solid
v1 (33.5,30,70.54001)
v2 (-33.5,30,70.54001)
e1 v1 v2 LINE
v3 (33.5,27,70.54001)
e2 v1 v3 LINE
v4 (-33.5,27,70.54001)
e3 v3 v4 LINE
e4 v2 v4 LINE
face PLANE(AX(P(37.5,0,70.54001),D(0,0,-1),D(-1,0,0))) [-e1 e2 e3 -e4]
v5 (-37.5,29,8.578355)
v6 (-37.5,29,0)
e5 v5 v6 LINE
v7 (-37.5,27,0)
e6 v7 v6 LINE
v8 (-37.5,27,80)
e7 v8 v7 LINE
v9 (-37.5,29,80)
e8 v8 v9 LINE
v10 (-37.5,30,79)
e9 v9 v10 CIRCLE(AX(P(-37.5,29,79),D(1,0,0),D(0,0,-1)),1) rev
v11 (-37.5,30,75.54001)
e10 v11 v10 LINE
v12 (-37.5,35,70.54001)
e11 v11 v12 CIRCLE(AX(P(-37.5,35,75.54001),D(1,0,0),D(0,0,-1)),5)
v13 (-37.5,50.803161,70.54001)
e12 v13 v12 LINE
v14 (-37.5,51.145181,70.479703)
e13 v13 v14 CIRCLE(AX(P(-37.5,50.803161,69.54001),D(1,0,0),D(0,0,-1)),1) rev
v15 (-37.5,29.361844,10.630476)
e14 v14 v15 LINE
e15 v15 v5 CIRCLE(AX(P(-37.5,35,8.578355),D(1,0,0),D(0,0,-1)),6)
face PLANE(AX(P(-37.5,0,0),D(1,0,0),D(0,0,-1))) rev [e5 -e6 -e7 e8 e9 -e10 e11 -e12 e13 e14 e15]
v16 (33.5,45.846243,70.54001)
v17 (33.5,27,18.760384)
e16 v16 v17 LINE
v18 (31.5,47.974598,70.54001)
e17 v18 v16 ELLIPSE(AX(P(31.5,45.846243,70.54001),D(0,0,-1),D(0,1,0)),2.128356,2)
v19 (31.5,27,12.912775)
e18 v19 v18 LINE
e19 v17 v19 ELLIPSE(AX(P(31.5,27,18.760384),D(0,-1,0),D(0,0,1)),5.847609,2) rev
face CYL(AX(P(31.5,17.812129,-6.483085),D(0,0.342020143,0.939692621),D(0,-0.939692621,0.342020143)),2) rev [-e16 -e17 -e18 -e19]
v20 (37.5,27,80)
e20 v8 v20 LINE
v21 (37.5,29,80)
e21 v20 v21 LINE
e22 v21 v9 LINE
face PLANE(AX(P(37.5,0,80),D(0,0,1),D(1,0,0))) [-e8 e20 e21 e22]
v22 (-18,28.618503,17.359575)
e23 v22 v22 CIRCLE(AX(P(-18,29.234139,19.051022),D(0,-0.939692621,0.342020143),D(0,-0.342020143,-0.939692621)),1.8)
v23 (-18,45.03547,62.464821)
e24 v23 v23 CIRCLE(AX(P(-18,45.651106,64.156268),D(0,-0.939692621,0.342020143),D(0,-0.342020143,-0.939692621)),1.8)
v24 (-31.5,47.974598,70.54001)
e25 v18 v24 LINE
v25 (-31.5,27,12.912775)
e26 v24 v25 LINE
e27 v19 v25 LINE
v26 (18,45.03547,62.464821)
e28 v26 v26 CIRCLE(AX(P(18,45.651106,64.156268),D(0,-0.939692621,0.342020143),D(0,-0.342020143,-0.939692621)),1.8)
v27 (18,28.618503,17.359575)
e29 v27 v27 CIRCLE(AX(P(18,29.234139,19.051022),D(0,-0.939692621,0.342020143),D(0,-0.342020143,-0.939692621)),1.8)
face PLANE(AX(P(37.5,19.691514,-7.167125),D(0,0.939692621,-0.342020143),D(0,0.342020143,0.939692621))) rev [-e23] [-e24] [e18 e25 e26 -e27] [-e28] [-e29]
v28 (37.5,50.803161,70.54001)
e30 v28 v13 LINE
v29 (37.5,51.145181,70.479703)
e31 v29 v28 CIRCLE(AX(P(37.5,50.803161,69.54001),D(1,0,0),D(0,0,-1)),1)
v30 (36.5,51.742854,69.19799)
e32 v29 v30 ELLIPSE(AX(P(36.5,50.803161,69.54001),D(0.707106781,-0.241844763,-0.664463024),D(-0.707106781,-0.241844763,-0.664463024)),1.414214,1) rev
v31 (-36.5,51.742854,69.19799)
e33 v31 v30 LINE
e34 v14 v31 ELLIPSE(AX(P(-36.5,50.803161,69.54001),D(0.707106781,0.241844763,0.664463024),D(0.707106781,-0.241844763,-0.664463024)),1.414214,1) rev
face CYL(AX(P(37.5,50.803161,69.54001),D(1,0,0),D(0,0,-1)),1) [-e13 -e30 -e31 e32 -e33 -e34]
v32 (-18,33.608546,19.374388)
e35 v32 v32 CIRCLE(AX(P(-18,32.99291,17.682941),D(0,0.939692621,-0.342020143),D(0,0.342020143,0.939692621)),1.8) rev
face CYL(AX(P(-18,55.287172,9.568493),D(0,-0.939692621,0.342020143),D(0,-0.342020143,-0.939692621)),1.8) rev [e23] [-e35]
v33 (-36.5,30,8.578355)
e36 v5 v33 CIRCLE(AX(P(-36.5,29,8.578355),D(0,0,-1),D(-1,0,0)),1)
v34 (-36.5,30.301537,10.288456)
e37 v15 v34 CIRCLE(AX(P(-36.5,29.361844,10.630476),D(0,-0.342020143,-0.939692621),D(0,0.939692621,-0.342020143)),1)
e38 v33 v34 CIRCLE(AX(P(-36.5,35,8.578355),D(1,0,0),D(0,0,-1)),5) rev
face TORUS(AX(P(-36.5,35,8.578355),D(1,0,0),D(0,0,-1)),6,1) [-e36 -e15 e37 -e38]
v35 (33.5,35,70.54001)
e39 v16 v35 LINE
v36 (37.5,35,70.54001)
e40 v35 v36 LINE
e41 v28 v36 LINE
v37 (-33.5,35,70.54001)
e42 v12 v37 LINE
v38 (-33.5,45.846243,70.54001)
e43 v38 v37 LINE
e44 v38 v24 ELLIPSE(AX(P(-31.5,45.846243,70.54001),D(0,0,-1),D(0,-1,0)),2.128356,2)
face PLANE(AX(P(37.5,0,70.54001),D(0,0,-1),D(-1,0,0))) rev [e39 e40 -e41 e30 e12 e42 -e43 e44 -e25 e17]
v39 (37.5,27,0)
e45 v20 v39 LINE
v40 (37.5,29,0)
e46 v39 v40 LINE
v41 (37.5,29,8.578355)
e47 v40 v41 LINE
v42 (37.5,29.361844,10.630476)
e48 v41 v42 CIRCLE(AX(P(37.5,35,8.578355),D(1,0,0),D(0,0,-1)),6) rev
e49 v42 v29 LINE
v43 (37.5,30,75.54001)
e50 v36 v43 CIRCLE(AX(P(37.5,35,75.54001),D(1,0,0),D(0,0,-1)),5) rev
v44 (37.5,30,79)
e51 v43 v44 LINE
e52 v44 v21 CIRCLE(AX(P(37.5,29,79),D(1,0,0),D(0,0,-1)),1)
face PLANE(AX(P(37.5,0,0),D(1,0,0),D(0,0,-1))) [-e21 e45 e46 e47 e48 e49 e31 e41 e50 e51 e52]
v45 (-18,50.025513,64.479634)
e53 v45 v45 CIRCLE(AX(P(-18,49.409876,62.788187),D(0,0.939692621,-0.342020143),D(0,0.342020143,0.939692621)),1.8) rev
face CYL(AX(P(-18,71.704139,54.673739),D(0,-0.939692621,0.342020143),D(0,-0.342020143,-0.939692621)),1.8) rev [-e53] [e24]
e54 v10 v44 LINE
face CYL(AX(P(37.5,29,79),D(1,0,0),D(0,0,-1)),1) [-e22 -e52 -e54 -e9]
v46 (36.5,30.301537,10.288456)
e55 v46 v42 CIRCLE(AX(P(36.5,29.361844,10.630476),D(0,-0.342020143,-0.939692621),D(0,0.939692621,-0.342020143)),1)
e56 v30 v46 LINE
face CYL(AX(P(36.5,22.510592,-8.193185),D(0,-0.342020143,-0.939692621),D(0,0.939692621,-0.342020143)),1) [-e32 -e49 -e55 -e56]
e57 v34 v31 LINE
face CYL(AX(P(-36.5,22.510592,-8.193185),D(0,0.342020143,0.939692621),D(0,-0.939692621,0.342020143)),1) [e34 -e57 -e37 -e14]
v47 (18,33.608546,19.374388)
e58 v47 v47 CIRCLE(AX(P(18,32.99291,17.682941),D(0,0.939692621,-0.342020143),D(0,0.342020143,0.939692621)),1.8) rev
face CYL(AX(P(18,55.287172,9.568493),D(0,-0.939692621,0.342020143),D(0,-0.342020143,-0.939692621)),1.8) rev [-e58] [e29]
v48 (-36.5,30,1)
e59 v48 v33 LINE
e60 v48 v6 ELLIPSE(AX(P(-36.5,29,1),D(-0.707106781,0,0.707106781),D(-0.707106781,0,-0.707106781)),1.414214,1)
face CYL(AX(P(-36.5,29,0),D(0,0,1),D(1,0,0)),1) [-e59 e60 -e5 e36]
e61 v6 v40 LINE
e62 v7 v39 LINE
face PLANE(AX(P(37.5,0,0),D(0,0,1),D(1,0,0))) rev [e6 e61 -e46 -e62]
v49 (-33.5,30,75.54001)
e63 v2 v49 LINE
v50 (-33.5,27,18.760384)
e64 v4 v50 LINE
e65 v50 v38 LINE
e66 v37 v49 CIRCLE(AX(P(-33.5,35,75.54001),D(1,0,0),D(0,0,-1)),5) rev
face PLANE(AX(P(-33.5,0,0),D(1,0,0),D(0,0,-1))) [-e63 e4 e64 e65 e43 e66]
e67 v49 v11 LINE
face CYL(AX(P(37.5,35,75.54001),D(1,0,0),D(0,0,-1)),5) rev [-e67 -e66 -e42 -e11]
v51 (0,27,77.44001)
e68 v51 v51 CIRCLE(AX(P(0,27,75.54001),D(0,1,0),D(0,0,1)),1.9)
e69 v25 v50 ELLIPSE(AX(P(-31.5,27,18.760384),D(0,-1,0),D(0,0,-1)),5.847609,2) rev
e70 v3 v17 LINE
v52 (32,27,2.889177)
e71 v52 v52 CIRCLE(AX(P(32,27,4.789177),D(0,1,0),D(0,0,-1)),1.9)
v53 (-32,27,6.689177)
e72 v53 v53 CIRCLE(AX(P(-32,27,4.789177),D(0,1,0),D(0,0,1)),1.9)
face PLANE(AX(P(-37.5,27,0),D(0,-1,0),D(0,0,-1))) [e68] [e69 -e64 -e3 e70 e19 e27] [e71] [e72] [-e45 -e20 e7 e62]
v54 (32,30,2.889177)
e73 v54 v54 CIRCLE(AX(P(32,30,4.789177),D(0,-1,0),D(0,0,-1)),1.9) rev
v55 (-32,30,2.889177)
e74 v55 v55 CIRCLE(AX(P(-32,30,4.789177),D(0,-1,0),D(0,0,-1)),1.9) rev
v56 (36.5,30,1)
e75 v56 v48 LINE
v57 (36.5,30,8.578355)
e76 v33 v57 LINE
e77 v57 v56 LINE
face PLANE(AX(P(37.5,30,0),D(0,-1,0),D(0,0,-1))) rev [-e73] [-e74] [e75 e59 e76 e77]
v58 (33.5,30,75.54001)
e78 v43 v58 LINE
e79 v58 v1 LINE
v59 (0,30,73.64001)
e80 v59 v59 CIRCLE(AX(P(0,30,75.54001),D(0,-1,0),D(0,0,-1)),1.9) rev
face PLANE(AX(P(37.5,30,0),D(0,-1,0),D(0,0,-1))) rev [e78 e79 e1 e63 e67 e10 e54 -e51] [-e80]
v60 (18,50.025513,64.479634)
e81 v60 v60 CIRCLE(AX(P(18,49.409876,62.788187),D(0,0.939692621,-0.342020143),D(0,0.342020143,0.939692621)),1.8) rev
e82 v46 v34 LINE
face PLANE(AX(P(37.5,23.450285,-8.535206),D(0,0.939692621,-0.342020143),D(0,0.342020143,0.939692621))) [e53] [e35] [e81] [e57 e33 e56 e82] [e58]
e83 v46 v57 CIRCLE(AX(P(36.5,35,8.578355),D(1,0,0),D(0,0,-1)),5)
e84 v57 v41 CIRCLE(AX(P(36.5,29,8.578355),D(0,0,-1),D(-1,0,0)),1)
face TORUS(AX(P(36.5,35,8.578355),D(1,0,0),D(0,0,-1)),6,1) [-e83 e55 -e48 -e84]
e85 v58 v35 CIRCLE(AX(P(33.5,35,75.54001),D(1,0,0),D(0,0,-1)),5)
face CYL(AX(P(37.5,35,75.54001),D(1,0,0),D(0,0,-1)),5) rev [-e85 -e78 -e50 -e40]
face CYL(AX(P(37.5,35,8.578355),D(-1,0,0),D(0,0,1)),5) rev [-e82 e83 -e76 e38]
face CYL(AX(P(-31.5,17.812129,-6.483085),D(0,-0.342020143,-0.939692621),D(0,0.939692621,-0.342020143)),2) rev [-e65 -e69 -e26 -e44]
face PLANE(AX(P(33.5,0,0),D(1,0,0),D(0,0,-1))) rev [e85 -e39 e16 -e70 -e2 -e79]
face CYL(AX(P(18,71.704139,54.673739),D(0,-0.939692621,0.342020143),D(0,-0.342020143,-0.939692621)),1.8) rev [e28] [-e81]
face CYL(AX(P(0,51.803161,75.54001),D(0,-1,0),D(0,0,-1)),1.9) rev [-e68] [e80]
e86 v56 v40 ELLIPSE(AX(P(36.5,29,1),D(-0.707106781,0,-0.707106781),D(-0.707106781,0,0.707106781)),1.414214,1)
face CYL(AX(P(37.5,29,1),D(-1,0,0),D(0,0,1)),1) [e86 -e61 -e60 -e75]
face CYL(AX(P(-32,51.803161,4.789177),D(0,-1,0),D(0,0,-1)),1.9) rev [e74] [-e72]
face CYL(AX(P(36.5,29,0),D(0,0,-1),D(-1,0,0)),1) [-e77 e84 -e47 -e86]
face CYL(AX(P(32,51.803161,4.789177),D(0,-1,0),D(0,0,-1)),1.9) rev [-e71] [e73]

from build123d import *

# Parameters (mm, degrees)
EXTRUDE_1_DEPTH          = 37.5
SHELL_START              = -33.5
SHELL_1_DEPTH            = 67
FILLET_1_R               = 5
FILLET_3_R               = 2
FILLET_4_R               = 1
CUT_EXTRUDE_2_DEPTH      = 94.307288033
CUT_EXTRUDE_2_DEPTH_BACK = 3
SKETCH_3_R               = 1.9
CUT_EXTRUDE_1_DEPTH      = 103.419810201
CUT_EXTRUDE_1_DEPTH_BACK = 103.419810201
SKETCH_2_W               = 80
SKETCH_2_H               = 27
CUT_EXTRUDE_3_REACH      = 102.177
SKETCH_4_R               = 1.8


# Read off the part's stored shape, not the designer's step: 抽壳1
with BuildPart() as part:
    # 草图1 → 凸台-拉伸1 (new, symmetric)
    with BuildSketch(Plane(origin=(0, 0, 0), x_dir=(0, 0, -1), z_dir=(1, 0, 0))):
        Polygon((-70.540010176, 52.231309316), (-70.540010176, 30), (-80, 30), (-80, 0), (0, 0), (0, 30), (-9.459989824, 30), align=None)
    extrude(amount=EXTRUDE_1_DEPTH, both=True)

    # 抽壳1 outline → 抽壳1 (cut)
    with BuildSketch(Plane.YZ.offset(SHELL_START)):
        Polygon((47.974598226, 70.540010176), (22, 70.540010176), (22, 80), (4, 80), (4, 6), (24.483955603, 6), align=None)
    extrude(amount=SHELL_1_DEPTH, mode=Mode.SUBTRACT)

    # 圆角1
    fillet_1_edges = [part.edges().sort_by_distance(p)[0] for p in [
        (0, 30, 9.459989824),
        (35.5, 30, 70.540010176),
        (-35.5, 30, 70.540010176),
    ]]
    fillet(fillet_1_edges, radius=FILLET_1_R)

    # 圆角3
    fillet_3_edges = [part.edges().sort_by_distance(p)[0] for p in [
        (33.5, 4, 43),
        (33.5, 36.229276914, 38.270005088),
        (-33.5, 36.229276914, 38.270005088),
        (-33.5, 4, 43),
    ]]
    fillet(fillet_3_edges, radius=FILLET_3_R)

    # 圆角4
    fillet_4_edges = [part.edges().sort_by_distance(p)[0] for p in [
        (-37.5, 30, 4.28917746),
        (-37.5, 30.075961235, 9.446595809),
        (37.5, 30, 4.28917746),
        (37.5, 30.075961235, 9.446595809),
        (-37.5, 41.266423106, 40.414232907),
        (0, 52.231309316, 70.540010176),
        (37.5, 41.266423106, 40.414232907),
        (37.5, 0, 40),
        (-37.5, 0, 40),
        (0, 0, 80),
        (0, 0, 0),
        (0, 30, 0),
        (0, 30, 80),
    ]]
    fillet(fillet_4_edges, radius=FILLET_4_R)

    # 草图3 → 切除-拉伸2 (cut, two sides: drawn at the far end of the back side and taken through both)
    with BuildSketch(Plane(origin=(0, 30, 0), x_dir=(1, 0, 0), z_dir=(0, 1, 0)).offset(-CUT_EXTRUDE_2_DEPTH_BACK)):
        with Locations(Location((-32, -4.78917746, 0), (0, 0, 90))):
            Circle(SKETCH_3_R)
        with Locations(Location((32, -4.78917746, 0), (0, 0, 90))):
            Circle(SKETCH_3_R)
        with Locations(Location((0, -75.540010176, 0), (0, 0, 90))):
            Circle(SKETCH_3_R)
    extrude(amount=CUT_EXTRUDE_2_DEPTH + CUT_EXTRUDE_2_DEPTH_BACK, mode=Mode.SUBTRACT)

    # 草图2 → 切除-拉伸1 (cut, two sides: drawn at the far end of the back side and taken through both)
    with BuildSketch(Plane(origin=(0, 0, 0), x_dir=(0, 0, -1), z_dir=(1, 0, 0)).offset(-CUT_EXTRUDE_1_DEPTH_BACK)):
        with Locations((-40, 13.5)):
            Rectangle(SKETCH_2_W, SKETCH_2_H)
    extrude(amount=CUT_EXTRUDE_1_DEPTH + CUT_EXTRUDE_1_DEPTH_BACK, mode=Mode.SUBTRACT)

    # 草图4 → 切除-拉伸3 (cut, up to next)
    with BuildSketch(Plane(origin=(0, 19.69151404, -7.167124978), x_dir=(1, 0, 0), z_dir=(0, -0.9396926207859104, 0.34202014332566316)), mode=Mode.PRIVATE) as cut_extrude_3_sk1:
        with Locations(Location((-18, 75.900768948, 0), (0, 0, 270))):
            Circle(SKETCH_4_R)
    cut_extrude_3_tool1 = extrude(cut_extrude_3_sk1.sketch, amount=-CUT_EXTRUDE_3_REACH, mode=Mode.PRIVATE) & part.part
    # 草图4 → 切除-拉伸3 (cut, up to next)
    with BuildSketch(Plane(origin=(0, 19.69151404, -7.167124978), x_dir=(1, 0, 0), z_dir=(0, -0.9396926207859104, 0.34202014332566316)), mode=Mode.PRIVATE) as cut_extrude_3_sk2:
        with Locations(Location((18, 75.900768948, 0), (0, 0, 270))):
            Circle(SKETCH_4_R)
    cut_extrude_3_tool2 = extrude(cut_extrude_3_sk2.sketch, amount=-CUT_EXTRUDE_3_REACH, mode=Mode.PRIVATE) & part.part
    # 草图4 → 切除-拉伸3 (cut, up to next)
    with BuildSketch(Plane(origin=(0, 19.69151404, -7.167124978), x_dir=(1, 0, 0), z_dir=(0, -0.9396926207859104, 0.34202014332566316)), mode=Mode.PRIVATE) as cut_extrude_3_sk3:
        with Locations(Location((-18, 27.900768948, 0), (0, 0, 270))):
            Circle(SKETCH_4_R)
    cut_extrude_3_tool3 = extrude(cut_extrude_3_sk3.sketch, amount=-CUT_EXTRUDE_3_REACH, mode=Mode.PRIVATE) & part.part
    # 草图4 → 切除-拉伸3 (cut, up to next)
    with BuildSketch(Plane(origin=(0, 19.69151404, -7.167124978), x_dir=(1, 0, 0), z_dir=(0, -0.9396926207859104, 0.34202014332566316)), mode=Mode.PRIVATE) as cut_extrude_3_sk4:
        with Locations(Location((18, 27.900768948, 0), (0, 0, 270))):
            Circle(SKETCH_4_R)
    cut_extrude_3_tool4 = extrude(cut_extrude_3_sk4.sketch, amount=-CUT_EXTRUDE_3_REACH, mode=Mode.PRIVATE) & part.part
    add(cut_extrude_3_tool1.solids().sort_by_distance((-18, 45.651106, 64.156268))[0], mode=Mode.SUBTRACT)
    add(cut_extrude_3_tool2.solids().sort_by_distance((18, 45.651106, 64.156268))[0], mode=Mode.SUBTRACT)
    add(cut_extrude_3_tool3.solids().sort_by_distance((-18, 29.234139, 19.051022))[0], mode=Mode.SUBTRACT)
    add(cut_extrude_3_tool4.solids().sort_by_distance((18, 29.234139, 19.051022))[0], mode=Mode.SUBTRACT)


solid = part.part
